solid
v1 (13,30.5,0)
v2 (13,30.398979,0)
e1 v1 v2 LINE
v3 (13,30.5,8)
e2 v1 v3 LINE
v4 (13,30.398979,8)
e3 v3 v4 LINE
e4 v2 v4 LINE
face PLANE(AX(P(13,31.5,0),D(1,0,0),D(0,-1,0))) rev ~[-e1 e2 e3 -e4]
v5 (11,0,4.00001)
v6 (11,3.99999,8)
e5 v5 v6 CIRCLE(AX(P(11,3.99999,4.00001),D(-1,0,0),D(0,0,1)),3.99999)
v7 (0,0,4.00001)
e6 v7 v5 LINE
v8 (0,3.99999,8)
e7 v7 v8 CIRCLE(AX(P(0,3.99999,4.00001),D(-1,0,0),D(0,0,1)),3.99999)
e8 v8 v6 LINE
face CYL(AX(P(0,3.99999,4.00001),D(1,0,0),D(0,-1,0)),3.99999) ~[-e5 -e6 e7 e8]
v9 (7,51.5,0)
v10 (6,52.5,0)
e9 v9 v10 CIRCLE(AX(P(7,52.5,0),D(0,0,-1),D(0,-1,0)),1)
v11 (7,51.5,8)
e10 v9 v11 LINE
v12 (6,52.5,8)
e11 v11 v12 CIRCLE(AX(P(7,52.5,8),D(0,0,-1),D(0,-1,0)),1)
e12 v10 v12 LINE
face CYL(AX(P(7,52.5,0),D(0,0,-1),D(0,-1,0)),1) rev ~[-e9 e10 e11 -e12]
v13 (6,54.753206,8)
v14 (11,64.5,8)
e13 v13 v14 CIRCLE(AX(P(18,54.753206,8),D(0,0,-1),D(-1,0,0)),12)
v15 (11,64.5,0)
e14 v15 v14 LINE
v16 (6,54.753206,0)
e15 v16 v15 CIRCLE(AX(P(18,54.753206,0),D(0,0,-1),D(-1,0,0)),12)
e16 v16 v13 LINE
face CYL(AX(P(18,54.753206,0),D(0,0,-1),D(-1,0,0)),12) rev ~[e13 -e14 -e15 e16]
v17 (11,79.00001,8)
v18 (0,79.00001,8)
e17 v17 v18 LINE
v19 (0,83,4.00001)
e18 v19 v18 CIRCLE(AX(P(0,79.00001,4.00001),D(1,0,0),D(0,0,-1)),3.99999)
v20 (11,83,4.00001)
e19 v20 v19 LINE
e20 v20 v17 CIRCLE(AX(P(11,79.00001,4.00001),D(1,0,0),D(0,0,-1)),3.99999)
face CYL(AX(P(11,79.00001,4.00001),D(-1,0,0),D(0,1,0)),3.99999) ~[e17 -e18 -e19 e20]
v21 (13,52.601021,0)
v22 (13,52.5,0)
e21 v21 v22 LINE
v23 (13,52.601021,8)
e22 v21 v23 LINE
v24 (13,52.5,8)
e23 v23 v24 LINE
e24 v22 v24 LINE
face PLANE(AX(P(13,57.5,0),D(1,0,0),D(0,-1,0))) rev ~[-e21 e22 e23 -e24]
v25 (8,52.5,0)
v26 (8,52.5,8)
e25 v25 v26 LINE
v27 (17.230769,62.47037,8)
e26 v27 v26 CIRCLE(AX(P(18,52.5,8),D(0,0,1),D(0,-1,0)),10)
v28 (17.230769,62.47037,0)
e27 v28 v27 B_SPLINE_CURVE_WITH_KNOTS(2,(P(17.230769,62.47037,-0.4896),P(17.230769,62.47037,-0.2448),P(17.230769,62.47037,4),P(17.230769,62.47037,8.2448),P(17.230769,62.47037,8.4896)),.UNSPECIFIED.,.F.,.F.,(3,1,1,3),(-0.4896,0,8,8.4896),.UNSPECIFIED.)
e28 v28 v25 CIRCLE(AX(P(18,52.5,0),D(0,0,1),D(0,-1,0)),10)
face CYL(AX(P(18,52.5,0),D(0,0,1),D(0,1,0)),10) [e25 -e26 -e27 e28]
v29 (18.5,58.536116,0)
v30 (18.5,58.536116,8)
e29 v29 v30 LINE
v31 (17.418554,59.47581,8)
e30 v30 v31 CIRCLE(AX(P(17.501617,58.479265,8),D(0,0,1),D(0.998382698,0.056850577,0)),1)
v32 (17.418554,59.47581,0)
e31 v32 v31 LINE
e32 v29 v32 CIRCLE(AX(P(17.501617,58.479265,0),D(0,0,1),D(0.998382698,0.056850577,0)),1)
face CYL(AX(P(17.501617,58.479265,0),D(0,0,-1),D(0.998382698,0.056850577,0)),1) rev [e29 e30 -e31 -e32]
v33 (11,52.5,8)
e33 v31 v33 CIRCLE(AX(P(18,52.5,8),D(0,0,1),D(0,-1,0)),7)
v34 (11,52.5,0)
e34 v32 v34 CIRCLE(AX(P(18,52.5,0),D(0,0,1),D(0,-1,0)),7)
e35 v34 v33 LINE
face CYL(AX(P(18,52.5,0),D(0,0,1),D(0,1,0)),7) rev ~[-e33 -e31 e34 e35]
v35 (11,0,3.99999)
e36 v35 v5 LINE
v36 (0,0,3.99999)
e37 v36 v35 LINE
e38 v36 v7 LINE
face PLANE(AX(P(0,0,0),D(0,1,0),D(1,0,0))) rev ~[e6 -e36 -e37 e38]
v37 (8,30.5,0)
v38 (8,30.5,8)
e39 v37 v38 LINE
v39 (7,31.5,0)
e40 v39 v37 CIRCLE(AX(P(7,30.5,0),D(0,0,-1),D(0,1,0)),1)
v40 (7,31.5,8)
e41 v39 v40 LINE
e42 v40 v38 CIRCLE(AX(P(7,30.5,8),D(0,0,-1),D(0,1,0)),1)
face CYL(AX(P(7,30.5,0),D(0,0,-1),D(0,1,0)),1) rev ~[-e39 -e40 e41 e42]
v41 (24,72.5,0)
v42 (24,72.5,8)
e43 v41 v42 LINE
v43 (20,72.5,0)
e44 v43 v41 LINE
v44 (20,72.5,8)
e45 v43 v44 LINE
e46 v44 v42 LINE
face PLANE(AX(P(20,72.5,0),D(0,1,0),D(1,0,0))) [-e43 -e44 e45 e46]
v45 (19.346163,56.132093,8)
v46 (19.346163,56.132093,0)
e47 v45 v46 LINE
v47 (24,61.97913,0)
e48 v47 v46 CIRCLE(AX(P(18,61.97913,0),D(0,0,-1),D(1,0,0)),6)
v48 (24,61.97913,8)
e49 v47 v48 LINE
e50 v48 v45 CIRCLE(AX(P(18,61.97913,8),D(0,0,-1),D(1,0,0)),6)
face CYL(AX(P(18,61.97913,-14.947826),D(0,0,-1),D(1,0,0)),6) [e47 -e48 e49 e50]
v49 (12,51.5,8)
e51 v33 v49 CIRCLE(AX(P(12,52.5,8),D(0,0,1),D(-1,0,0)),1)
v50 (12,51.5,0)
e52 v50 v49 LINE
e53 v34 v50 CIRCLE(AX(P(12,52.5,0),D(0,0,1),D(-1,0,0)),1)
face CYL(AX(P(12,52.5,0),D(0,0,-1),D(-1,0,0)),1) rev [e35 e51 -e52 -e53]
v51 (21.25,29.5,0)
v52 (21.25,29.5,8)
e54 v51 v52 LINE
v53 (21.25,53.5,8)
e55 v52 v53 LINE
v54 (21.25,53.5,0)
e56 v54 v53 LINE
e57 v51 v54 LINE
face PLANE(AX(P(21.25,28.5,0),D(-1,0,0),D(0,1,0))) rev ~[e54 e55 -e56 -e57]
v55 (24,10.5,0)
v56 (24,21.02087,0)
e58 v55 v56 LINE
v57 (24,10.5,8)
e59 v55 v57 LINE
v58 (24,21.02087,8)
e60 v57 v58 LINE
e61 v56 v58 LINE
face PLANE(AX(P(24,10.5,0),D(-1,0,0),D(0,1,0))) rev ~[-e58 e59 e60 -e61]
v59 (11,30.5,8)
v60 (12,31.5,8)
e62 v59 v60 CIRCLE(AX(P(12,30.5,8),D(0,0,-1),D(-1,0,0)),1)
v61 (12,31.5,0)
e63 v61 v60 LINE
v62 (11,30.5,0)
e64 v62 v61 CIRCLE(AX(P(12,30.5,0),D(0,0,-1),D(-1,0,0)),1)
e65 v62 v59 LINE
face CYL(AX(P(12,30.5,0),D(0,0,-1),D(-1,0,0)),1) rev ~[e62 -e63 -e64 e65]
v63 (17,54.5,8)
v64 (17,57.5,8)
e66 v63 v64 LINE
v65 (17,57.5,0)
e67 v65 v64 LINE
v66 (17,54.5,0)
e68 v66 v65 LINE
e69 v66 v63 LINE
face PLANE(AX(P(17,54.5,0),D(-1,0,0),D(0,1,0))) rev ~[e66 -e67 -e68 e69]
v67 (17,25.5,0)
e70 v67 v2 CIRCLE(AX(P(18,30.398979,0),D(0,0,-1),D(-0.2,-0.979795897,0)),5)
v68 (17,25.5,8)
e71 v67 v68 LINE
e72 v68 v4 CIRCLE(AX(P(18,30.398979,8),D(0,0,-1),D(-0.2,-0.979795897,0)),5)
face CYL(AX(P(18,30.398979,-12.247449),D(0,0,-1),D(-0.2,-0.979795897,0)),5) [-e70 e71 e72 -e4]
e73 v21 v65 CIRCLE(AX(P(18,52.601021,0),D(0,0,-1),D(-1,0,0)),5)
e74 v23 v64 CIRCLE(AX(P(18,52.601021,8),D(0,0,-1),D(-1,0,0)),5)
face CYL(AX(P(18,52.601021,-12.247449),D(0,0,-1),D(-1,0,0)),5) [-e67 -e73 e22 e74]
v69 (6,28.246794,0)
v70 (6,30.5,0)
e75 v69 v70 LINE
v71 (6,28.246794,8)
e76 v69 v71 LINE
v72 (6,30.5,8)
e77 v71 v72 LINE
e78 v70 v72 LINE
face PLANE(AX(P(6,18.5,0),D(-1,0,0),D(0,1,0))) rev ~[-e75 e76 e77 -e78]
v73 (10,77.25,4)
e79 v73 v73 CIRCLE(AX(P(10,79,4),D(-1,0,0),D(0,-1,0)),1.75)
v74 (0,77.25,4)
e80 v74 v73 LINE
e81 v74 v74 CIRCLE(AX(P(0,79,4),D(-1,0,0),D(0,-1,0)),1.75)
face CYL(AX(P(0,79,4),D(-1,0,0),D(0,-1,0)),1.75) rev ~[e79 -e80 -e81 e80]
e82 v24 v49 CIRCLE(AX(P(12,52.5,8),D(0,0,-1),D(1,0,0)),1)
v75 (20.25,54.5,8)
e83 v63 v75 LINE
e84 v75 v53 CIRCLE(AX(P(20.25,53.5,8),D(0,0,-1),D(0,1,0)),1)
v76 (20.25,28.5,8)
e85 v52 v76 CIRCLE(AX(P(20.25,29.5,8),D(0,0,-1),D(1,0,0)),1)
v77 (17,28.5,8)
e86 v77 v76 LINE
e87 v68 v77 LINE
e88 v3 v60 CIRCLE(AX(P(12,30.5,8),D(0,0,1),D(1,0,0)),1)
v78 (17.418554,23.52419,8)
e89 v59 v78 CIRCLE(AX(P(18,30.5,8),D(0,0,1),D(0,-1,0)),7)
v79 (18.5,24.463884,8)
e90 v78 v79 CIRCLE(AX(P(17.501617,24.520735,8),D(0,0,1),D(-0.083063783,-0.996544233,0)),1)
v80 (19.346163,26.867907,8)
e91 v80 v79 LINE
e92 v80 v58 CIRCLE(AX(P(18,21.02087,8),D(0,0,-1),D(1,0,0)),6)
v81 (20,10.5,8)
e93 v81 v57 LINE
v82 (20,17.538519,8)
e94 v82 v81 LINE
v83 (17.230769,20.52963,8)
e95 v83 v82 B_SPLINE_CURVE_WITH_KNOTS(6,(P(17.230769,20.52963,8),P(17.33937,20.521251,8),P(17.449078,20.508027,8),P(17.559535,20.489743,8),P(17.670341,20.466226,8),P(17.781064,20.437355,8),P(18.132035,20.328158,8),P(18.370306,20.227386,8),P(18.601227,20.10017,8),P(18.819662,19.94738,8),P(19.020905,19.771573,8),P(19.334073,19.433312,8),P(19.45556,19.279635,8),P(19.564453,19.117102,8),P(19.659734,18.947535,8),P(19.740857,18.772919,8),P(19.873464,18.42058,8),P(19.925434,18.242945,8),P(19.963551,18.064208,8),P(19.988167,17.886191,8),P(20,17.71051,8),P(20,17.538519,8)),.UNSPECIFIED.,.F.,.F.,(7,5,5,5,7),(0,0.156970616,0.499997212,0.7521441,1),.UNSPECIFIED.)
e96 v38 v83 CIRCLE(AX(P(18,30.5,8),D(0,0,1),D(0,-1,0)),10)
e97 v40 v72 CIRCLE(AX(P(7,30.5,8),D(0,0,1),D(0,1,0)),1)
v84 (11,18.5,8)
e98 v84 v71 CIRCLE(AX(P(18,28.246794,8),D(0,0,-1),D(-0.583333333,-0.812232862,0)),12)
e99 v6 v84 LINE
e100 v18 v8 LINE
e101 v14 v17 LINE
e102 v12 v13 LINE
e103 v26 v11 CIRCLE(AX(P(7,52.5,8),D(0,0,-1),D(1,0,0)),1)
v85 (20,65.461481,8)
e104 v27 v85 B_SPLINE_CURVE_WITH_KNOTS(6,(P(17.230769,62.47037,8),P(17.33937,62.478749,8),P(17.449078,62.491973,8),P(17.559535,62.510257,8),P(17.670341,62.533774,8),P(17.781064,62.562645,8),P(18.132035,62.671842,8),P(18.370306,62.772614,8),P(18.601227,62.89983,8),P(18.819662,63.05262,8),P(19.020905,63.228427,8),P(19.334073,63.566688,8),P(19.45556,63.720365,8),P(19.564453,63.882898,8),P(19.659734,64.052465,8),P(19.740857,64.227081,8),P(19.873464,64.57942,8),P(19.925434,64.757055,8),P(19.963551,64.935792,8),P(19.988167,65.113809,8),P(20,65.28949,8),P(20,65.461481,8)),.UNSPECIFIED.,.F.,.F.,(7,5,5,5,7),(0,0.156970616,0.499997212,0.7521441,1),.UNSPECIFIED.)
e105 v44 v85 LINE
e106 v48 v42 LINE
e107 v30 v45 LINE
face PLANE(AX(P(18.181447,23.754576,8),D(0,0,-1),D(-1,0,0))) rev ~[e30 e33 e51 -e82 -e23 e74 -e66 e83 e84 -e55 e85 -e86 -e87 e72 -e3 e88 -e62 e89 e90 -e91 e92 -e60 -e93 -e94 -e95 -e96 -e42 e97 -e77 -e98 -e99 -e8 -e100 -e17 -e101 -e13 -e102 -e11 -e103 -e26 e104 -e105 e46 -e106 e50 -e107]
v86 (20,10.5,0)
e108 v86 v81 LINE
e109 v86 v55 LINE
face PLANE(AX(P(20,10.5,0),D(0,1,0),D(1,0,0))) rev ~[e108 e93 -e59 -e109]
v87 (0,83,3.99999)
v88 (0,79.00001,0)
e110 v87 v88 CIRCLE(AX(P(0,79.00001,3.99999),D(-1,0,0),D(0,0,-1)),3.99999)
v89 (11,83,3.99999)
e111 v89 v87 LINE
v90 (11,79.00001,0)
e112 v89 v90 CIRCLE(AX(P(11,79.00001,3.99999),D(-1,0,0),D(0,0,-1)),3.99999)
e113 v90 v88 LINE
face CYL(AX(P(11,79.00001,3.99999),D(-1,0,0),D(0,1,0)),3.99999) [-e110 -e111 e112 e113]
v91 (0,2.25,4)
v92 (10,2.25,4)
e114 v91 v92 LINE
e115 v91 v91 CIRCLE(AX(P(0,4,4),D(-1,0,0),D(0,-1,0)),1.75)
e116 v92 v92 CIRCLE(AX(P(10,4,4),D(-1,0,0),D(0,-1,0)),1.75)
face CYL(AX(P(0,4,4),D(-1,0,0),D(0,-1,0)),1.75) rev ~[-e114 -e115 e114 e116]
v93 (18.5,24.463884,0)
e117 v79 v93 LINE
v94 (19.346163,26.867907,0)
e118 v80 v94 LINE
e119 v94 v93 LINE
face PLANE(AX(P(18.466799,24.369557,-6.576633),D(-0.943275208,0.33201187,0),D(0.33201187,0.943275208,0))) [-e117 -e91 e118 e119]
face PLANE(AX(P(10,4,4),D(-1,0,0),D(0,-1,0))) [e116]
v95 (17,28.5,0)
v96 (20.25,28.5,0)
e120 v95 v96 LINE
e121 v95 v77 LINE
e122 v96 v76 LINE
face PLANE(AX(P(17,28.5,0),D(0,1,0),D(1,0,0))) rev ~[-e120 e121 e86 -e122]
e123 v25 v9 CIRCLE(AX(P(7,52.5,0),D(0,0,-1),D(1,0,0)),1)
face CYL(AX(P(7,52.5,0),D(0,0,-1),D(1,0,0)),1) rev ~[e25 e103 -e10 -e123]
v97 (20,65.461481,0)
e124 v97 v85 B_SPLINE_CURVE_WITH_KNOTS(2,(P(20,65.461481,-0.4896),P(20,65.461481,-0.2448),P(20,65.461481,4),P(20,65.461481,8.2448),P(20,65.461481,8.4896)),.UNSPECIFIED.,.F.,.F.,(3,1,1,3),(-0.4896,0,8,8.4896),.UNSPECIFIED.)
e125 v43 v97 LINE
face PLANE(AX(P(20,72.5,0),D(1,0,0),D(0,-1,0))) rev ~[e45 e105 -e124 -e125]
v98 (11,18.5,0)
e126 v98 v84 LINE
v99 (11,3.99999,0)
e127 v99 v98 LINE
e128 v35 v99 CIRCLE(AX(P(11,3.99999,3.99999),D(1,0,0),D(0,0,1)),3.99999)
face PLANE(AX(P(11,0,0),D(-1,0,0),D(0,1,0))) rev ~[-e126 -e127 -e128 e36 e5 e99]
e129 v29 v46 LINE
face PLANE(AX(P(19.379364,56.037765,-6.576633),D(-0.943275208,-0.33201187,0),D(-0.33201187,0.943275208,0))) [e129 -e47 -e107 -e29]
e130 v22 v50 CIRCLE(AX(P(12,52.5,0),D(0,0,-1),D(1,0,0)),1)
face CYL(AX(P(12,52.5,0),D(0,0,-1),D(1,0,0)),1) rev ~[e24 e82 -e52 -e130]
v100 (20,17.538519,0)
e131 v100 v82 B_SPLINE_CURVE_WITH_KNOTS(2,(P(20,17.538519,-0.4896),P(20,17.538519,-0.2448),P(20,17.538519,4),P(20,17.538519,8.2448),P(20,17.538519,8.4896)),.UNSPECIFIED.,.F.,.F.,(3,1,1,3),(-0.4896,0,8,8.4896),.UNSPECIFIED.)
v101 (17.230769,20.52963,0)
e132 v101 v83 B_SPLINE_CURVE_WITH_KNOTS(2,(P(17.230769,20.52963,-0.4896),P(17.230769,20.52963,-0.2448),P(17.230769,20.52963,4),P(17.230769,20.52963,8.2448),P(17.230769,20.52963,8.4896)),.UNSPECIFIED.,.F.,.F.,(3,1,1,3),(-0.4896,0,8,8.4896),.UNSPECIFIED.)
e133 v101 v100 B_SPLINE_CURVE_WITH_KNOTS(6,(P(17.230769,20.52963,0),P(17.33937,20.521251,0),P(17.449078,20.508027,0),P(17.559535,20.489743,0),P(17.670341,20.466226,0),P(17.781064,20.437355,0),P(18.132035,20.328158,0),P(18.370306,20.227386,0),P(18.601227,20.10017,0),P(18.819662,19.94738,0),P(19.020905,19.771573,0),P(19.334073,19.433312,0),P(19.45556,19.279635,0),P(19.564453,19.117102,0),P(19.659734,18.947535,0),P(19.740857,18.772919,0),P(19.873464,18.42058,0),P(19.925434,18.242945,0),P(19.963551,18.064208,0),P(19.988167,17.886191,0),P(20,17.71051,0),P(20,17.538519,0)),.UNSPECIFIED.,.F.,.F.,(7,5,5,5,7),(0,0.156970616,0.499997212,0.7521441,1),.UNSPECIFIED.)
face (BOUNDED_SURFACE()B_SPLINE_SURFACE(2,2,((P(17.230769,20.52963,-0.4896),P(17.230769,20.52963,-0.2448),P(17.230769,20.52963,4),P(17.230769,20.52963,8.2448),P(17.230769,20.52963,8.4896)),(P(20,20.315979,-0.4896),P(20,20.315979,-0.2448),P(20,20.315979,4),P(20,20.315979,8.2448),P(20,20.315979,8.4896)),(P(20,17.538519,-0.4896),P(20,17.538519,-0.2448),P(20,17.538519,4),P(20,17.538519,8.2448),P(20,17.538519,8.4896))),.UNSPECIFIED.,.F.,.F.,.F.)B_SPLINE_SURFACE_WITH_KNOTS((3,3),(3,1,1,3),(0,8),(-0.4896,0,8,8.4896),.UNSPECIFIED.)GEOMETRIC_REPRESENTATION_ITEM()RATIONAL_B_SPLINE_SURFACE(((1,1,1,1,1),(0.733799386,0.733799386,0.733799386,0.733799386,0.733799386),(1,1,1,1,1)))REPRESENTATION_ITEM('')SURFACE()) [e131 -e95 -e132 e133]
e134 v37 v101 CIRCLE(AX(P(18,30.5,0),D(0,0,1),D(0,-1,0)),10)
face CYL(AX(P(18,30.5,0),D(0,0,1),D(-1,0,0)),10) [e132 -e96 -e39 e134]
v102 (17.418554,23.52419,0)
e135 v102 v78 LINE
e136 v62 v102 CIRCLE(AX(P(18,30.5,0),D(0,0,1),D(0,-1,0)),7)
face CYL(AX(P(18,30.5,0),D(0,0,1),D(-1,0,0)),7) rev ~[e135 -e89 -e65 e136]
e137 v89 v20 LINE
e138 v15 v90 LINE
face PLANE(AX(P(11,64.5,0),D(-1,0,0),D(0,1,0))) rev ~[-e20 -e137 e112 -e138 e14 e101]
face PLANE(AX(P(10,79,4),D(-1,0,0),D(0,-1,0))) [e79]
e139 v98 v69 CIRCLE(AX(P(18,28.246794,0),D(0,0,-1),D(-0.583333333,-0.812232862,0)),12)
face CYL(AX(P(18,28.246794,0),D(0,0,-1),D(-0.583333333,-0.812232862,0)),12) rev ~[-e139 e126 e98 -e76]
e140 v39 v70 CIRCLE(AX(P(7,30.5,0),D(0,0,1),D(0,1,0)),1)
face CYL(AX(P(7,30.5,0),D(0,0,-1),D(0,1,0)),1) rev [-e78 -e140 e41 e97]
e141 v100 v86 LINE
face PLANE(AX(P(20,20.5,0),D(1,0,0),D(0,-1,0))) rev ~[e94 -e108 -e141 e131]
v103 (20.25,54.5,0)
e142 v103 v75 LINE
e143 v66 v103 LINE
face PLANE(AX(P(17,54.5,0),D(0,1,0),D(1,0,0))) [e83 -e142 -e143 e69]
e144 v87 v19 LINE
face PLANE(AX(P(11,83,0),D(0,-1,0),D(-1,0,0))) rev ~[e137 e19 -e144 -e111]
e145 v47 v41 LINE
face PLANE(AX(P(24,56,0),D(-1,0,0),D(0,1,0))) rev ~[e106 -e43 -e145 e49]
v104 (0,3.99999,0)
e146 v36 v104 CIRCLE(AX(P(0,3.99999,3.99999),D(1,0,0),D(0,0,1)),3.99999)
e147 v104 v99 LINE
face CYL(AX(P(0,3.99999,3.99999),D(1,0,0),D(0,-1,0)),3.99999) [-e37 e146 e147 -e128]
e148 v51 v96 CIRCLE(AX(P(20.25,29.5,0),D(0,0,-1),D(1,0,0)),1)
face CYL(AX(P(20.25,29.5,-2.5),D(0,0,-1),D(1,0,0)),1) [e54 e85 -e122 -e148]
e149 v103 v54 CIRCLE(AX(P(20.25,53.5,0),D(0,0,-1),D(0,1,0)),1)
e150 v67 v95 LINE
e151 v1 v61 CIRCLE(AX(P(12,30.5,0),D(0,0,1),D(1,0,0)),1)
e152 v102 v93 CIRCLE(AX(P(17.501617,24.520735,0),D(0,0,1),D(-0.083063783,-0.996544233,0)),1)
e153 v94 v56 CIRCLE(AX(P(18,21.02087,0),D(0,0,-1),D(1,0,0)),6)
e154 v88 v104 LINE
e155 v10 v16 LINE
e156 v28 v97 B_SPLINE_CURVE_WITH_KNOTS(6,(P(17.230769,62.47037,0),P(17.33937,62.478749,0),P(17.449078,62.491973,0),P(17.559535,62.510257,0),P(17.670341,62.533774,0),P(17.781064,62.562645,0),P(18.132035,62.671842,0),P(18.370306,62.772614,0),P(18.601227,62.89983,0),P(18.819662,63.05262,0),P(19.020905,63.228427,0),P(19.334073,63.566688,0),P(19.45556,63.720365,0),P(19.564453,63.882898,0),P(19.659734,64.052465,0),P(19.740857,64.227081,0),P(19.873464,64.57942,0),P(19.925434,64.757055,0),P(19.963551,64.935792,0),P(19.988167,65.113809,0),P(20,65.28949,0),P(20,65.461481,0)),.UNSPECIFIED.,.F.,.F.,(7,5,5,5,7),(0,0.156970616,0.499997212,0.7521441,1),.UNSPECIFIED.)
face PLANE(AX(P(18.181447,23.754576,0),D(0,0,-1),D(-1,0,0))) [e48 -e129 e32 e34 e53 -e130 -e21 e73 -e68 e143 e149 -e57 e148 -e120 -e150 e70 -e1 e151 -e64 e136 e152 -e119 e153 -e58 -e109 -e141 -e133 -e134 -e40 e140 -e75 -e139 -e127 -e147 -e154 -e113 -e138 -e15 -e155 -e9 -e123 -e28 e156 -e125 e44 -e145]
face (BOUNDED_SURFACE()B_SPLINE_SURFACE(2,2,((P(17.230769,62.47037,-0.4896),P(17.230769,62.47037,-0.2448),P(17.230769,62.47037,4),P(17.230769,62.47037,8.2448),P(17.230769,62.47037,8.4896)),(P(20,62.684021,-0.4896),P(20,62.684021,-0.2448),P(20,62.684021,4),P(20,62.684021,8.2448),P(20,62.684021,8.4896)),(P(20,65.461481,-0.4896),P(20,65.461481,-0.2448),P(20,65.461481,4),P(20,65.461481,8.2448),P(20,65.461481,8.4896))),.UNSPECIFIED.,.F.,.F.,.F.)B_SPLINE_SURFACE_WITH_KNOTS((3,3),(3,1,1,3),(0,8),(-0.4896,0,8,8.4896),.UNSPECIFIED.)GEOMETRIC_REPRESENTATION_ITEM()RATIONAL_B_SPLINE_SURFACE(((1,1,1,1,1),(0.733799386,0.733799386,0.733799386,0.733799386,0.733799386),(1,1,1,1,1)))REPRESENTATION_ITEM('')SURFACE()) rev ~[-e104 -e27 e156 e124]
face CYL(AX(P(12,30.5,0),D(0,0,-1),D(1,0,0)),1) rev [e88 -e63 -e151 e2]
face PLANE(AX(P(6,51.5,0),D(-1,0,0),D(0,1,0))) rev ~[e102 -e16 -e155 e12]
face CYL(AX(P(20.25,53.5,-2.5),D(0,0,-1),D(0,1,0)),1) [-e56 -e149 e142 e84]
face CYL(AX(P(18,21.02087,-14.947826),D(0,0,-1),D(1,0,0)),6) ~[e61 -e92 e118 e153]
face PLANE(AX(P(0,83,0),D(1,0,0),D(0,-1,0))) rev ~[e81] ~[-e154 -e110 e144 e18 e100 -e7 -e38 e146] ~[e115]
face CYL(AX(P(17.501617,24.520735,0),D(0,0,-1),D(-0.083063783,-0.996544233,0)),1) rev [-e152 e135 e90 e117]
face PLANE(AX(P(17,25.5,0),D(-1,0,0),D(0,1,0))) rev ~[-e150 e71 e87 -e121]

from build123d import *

# Parameters (mm, degrees)
F0_W          = 4
F0_H          = 8
F0_H_2        = 2
F0_W_2        = 5.5
F0_H_3        = 3.5
F0_W_3        = 4.25
F0_H_4        = 26
F1_DEPTH      = 8
F2_R          = 3.99999
F3_T1_DEPTH   = 37.8956518578
F4_T1_DEPTH   = 21.1532650868
F5_T1_DEPTH   = 21.1532650868
F6_R          = 1.75
F7_DEPTH      = 10
F8_T1_DEPTH   = 32.4948974279
F9_R          = 7
F10_R         = 10
F11_T1_DEPTH  = 8
F12_R         = 3
F13_T1_DEPTH  = 8
F13_T3_DEPTH  = 8
F13_T5_DEPTH  = 8
F13_T7_DEPTH  = 8
F13_T9_DEPTH  = 8
F13_T11_DEPTH = 8
F13_T13_DEPTH = 8
F13_T15_DEPTH = 8
F13_T17_DEPTH = 8
F13_T19_DEPTH = 8
F13_T21_DEPTH = 13
F13_T23_DEPTH = 13


# Not quite as in the source:
# - a fillet or chamfer that OpenCascade refuses, or shapes differently, is made with other operations: its cross-section is extruded or revolved along the edge and cut away or added
# - two fillets or chamfers of one size are made in one step
# - a fillet or chamfer is up to 0.001 mm smaller than in the source, because OpenCascade refuses the exact size


with BuildPart() as f1:
    # F0 (on Top) → F1 (new body)
    with BuildSketch(Plane.XY):
        Polygon((0, 83), (0, 0), (11, 0), (11, 10), (11, 18.5), (6, 18.5), (6, 31.5), (8, 31.5), (11, 31.5), (13, 31.5), (13, 25.5), (17, 25.5), (17, 28.5), (17, 54.5), (17, 57.5), (13, 57.5), (13, 51.5), (11, 51.5), (8, 51.5), (6, 51.5), (6, 64.5), (11, 64.5), (11, 73), (11, 83), align=None)
        with Locations((22, 68.5)):
            Rectangle(F0_W, F0_H)
        with Locations((22, 63.5)):
            Rectangle(F0_W, F0_H_2)
        with Locations((21.25, 57.75)):
            Rectangle(F0_W_2, F0_H_3)
        with Locations((21.25, 25.25)):
            Rectangle(F0_W_2, F0_H_3)
        with Locations((22, 19.5)):
            Rectangle(F0_W, F0_H_2)
        with Locations((22, 14.5)):
            Rectangle(F0_W, F0_H)
        Polygon((11, 23.5), (11, 20.5), (20, 20.5), (24, 20.5), (24, 23.5), (18.5, 23.5), (17, 23.5), align=None)
        Polygon((8, 20.5), (11, 20.5), (11, 23.5), (11, 25.5), (11, 31.5), (8, 31.5), align=None)
        Polygon((11, 59.5), (11, 62.5), (8, 62.5), (8, 51.5), (11, 51.5), (11, 57.5), align=None)
        Polygon((20, 62.5), (11, 62.5), (11, 59.5), (17, 59.5), (18.5, 59.5), (24, 59.5), (24, 62.5), align=None)
        with Locations((19.125, 41.5)):
            Rectangle(F0_W_3, F0_H_4)
    extrude(amount=F1_DEPTH)

    # F2 (radius 4 in the source; OpenCascade refuses exactly that, so slightly less here)
    f2_edges = [f1.edges().sort_by_distance(p)[0] for p in [
        (5.5, 83, 8),
        (5.5, 0, 8),
        (5.5, 0, 0),
        (5.5, 83, 0),
    ]]
    fillet(f2_edges, radius=F2_R)

    # F3: fillet of radius 6 on 2 edges, made by hand

    # F3_s2 → F3_t1 (cut)
    with BuildSketch(Plane.XY.offset(-14.9478259289)):
        with BuildLine():
            ThreePointArc((24, 61.9791303716), (22.4158804332, 57.9171111692), (18.5, 56))
            Line((18.5, 56), (24, 56))
            Line((24, 56), (24, 61.9791303716))
        make_face()
        with BuildLine():
            ThreePointArc((24, 21.0208696284), (22.4158804332, 25.0828888308), (18.5, 27))
            Line((18.5, 27), (24, 27))
            Line((24, 27), (24, 21.0208696284))
        make_face()
    extrude(amount=F3_T1_DEPTH, mode=Mode.SUBTRACT)

    # F4: chamfer of 0.5 x 2.5 on 1 edges, made by hand

    # F4_s2 → F4_t1 (cut)
    with BuildSketch(Plane.XY.offset(-6.5766325434)):
        with BuildLine():
            Line((19.379363756, 56.0377654524), (18.466798813, 58.6304434947))
            Line((18.466798813, 58.6304434947), (18.416798813, 58.6304434947))
            ThreePointArc((18.416798813, 58.6304434947), (18.45, 57.3152217474), (18.45, 56))
            Line((18.45, 56), (18.5041666667, 55.9501739136))
            ThreePointArc((18.5041666667, 55.9501739136), (18.9421943049, 56.0029468158), (19.3905817774, 55.9890401407))
            Line((19.3905817774, 55.9890401407), (19.379363756, 56.0377654524))
        make_face()
    extrude(amount=F4_T1_DEPTH, mode=Mode.SUBTRACT)

    # F5: chamfer of 0.5 x 2.5 on 1 edges, made by hand

    # F5_s2 → F5_t1 (cut)
    with BuildSketch(Plane.XY.offset(-6.5766325434)):
        with BuildLine():
            Line((18.466798813, 24.3695565053), (19.379363756, 26.9622345476))
            Line((19.379363756, 26.9622345476), (19.3905817774, 27.0109598593))
            ThreePointArc((19.3905817774, 27.0109598593), (18.9421943049, 26.9970531842), (18.5041666667, 27.0498260864))
            Line((18.5041666667, 27.0498260864), (18.45, 27))
            ThreePointArc((18.45, 27), (18.45, 25.6847782526), (18.416798813, 24.3695565053))
            Line((18.416798813, 24.3695565053), (18.466798813, 24.3695565053))
        make_face()
    extrude(amount=F5_T1_DEPTH, mode=Mode.SUBTRACT)

    # F6 (on face) → F7 (cut)
    with BuildSketch(Plane(origin=(0, 0, 0), x_dir=(0, -1, 0), z_dir=(-1, 0, 0))):
        with Locations((-79, 4)):
            Circle(F6_R)
        with Locations((-4, 4)):
            Circle(F6_R)
    extrude(amount=-F7_DEPTH, mode=Mode.SUBTRACT)

    # F8: fillet of radius 5 on 2 edges, made by hand

    # F8_s2 → F8_t1 (cut)
    with BuildSketch(Plane.XY.offset(-12.2474487139)):
        with BuildLine():
            ThreePointArc((13, 52.6010205144), (14.1270166538, 55.7632981746), (17, 57.5))
            Line((17, 57.5), (13, 57.5))
            Line((13, 57.5), (13, 52.6010205144))
        make_face()
        with BuildLine():
            ThreePointArc((17, 25.5), (14.1270166538, 27.2367018254), (13, 30.3989794856))
            Line((13, 30.3989794856), (13, 25.5))
            Line((13, 25.5), (17, 25.5))
        make_face()
    extrude(amount=F8_T1_DEPTH, mode=Mode.SUBTRACT)

    # F9
    f9_edges = [f1.edges().sort_by_distance(p)[0] for p in [
        (11, 59.5, 4),
        (11, 23.5, 4),
    ]]
    fillet(f9_edges, radius=F9_R)

    # F10
    f10_edges = [f1.edges().sort_by_distance(p)[0] for p in [
        (8, 62.5, 4),
        (8, 20.5, 4),
    ]]
    fillet(f10_edges, radius=F10_R)

    # F11: fillet of radius 12 on 2 edges, made by hand

    # F11_s2 → F11_t1 (join)
    with BuildSketch(Plane.XY):
        with BuildLine():
            ThreePointArc((6, 54.7532056552), (7.322921748, 60.2304312302), (11, 64.5))
            Line((11, 64.5), (6, 64.5))
            Line((6, 64.5), (6, 54.7532056552))
        make_face()
        with BuildLine():
            ThreePointArc((11, 18.5), (7.322921748, 22.7695687698), (6, 28.2467943448))
            Line((6, 28.2467943448), (6, 18.5))
            Line((6, 18.5), (11, 18.5))
        make_face()
    extrude(amount=F11_T1_DEPTH)

    # F12
    f12_edges = [f1.edges().sort_by_distance(p)[0] for p in [
        (20, 62.5, 4),
        (20, 20.5, 4),
    ]]
    fillet(f12_edges, radius=F12_R)

    # F13: fillet of radius 1 on 12 edges, made by hand

    # F13_s2 → F13_t1 (join)
    with BuildSketch(Plane.XY):
        with BuildLine():
            ThreePointArc((8, 52.5), (7.7071067812, 51.7928932188), (7, 51.5))
            Line((7, 51.5), (8, 51.5))
            Line((8, 51.5), (8, 52.5))
        make_face()
    extrude(amount=F13_T1_DEPTH)

    # F13_s4 → F13_t3 (join)
    with BuildSketch(Plane.XY):
        with BuildLine():
            ThreePointArc((7, 51.5), (6.2928932188, 51.7928932188), (6, 52.5))
            Line((6, 52.5), (6, 51.5))
            Line((6, 51.5), (7, 51.5))
        make_face()
    extrude(amount=F13_T3_DEPTH)

    # F13_s6 → F13_t5 (join)
    with BuildSketch(Plane.XY):
        with BuildLine():
            ThreePointArc((18.5, 58.536115974), (18.1575199019, 59.2341109303), (17.4185535189, 59.4758096297))
            Line((17.4185535189, 59.4758096297), (17.4102471406, 59.575464053))
            ThreePointArc((17.4102471406, 59.575464053), (18, 59.6), (18.5, 59.6))
            Line((18.5, 59.6), (18.6, 59.5))
            ThreePointArc((18.6, 59.5), (18.6, 59.018057987), (18.5998382698, 58.5418010318))
            Line((18.5998382698, 58.5418010318), (18.5, 58.536115974))
        make_face()
    extrude(amount=F13_T5_DEPTH)

    # F13_s8 → F13_t7 (join)
    with BuildSketch(Plane.XY):
        with BuildLine():
            ThreePointArc((11, 52.5), (11.2928932188, 51.7928932188), (12, 51.5))
            Line((12, 51.5), (11, 51.5))
            Line((11, 51.5), (11, 52.5))
        make_face()
    extrude(amount=F13_T7_DEPTH)

    # F13_s10 → F13_t9 (join)
    with BuildSketch(Plane.XY):
        with BuildLine():
            ThreePointArc((13, 52.5), (12.7071067812, 51.7928932188), (12, 51.5))
            Line((12, 51.5), (13, 51.5))
            Line((13, 51.5), (13, 52.5))
        make_face()
    extrude(amount=F13_T9_DEPTH)

    # F13_s12 → F13_t11 (join)
    with BuildSketch(Plane.XY):
        with BuildLine():
            ThreePointArc((7, 31.5), (6.2928932188, 31.2071067812), (6, 30.5))
            Line((6, 30.5), (6, 31.5))
            Line((6, 31.5), (7, 31.5))
        make_face()
    extrude(amount=F13_T11_DEPTH)

    # F13_s14 → F13_t13 (join)
    with BuildSketch(Plane.XY):
        with BuildLine():
            ThreePointArc((7, 31.5), (7.7071067812, 31.2071067812), (8, 30.5))
            Line((8, 30.5), (8, 31.5))
            Line((8, 31.5), (7, 31.5))
        make_face()
    extrude(amount=F13_T13_DEPTH)

    # F13_s16 → F13_t15 (join)
    with BuildSketch(Plane.XY):
        with BuildLine():
            ThreePointArc((13, 30.5), (12.7071067812, 31.2071067812), (12, 31.5))
            Line((12, 31.5), (13, 31.5))
            Line((13, 31.5), (13, 30.5))
        make_face()
    extrude(amount=F13_T15_DEPTH)

    # F13_s18 → F13_t17 (join)
    with BuildSketch(Plane.XY):
        with BuildLine():
            ThreePointArc((11, 30.5), (11.2928932188, 31.2071067812), (12, 31.5))
            Line((12, 31.5), (11, 31.5))
            Line((11, 31.5), (11, 30.5))
        make_face()
    extrude(amount=F13_T17_DEPTH)

    # F13_s20 → F13_t19 (join)
    with BuildSketch(Plane.XY):
        with BuildLine():
            ThreePointArc((17.4185535189, 23.5241903703), (18.1575199019, 23.7658890697), (18.5, 24.463884026))
            Line((18.5, 24.463884026), (18.5998382698, 24.4581989682))
            ThreePointArc((18.5998382698, 24.4581989682), (18.6, 23.981942013), (18.6, 23.5))
            Line((18.6, 23.5), (18.5, 23.4))
            ThreePointArc((18.5, 23.4), (18, 23.4), (17.4102471406, 23.424535947))
            Line((17.4102471406, 23.424535947), (17.4185535189, 23.5241903703))
        make_face()
    extrude(amount=F13_T19_DEPTH)

    # F13_s22 → F13_t21 (cut)
    with BuildSketch(Plane.XY.offset(-2.5)):
        with BuildLine():
            ThreePointArc((20.25, 54.5), (20.9571067812, 54.2071067812), (21.25, 53.5))
            Line((21.25, 53.5), (21.25, 54.5))
            Line((21.25, 54.5), (20.25, 54.5))
        make_face()
    extrude(amount=F13_T21_DEPTH, mode=Mode.SUBTRACT)

    # F13_s24 → F13_t23 (cut)
    with BuildSketch(Plane.XY.offset(-2.5)):
        with BuildLine():
            ThreePointArc((21.25, 29.5), (20.9571067812, 28.7928932188), (20.25, 28.5))
            Line((20.25, 28.5), (21.25, 28.5))
            Line((21.25, 28.5), (21.25, 29.5))
        make_face()
    extrude(amount=F13_T23_DEPTH, mode=Mode.SUBTRACT)


solid = f1.part
